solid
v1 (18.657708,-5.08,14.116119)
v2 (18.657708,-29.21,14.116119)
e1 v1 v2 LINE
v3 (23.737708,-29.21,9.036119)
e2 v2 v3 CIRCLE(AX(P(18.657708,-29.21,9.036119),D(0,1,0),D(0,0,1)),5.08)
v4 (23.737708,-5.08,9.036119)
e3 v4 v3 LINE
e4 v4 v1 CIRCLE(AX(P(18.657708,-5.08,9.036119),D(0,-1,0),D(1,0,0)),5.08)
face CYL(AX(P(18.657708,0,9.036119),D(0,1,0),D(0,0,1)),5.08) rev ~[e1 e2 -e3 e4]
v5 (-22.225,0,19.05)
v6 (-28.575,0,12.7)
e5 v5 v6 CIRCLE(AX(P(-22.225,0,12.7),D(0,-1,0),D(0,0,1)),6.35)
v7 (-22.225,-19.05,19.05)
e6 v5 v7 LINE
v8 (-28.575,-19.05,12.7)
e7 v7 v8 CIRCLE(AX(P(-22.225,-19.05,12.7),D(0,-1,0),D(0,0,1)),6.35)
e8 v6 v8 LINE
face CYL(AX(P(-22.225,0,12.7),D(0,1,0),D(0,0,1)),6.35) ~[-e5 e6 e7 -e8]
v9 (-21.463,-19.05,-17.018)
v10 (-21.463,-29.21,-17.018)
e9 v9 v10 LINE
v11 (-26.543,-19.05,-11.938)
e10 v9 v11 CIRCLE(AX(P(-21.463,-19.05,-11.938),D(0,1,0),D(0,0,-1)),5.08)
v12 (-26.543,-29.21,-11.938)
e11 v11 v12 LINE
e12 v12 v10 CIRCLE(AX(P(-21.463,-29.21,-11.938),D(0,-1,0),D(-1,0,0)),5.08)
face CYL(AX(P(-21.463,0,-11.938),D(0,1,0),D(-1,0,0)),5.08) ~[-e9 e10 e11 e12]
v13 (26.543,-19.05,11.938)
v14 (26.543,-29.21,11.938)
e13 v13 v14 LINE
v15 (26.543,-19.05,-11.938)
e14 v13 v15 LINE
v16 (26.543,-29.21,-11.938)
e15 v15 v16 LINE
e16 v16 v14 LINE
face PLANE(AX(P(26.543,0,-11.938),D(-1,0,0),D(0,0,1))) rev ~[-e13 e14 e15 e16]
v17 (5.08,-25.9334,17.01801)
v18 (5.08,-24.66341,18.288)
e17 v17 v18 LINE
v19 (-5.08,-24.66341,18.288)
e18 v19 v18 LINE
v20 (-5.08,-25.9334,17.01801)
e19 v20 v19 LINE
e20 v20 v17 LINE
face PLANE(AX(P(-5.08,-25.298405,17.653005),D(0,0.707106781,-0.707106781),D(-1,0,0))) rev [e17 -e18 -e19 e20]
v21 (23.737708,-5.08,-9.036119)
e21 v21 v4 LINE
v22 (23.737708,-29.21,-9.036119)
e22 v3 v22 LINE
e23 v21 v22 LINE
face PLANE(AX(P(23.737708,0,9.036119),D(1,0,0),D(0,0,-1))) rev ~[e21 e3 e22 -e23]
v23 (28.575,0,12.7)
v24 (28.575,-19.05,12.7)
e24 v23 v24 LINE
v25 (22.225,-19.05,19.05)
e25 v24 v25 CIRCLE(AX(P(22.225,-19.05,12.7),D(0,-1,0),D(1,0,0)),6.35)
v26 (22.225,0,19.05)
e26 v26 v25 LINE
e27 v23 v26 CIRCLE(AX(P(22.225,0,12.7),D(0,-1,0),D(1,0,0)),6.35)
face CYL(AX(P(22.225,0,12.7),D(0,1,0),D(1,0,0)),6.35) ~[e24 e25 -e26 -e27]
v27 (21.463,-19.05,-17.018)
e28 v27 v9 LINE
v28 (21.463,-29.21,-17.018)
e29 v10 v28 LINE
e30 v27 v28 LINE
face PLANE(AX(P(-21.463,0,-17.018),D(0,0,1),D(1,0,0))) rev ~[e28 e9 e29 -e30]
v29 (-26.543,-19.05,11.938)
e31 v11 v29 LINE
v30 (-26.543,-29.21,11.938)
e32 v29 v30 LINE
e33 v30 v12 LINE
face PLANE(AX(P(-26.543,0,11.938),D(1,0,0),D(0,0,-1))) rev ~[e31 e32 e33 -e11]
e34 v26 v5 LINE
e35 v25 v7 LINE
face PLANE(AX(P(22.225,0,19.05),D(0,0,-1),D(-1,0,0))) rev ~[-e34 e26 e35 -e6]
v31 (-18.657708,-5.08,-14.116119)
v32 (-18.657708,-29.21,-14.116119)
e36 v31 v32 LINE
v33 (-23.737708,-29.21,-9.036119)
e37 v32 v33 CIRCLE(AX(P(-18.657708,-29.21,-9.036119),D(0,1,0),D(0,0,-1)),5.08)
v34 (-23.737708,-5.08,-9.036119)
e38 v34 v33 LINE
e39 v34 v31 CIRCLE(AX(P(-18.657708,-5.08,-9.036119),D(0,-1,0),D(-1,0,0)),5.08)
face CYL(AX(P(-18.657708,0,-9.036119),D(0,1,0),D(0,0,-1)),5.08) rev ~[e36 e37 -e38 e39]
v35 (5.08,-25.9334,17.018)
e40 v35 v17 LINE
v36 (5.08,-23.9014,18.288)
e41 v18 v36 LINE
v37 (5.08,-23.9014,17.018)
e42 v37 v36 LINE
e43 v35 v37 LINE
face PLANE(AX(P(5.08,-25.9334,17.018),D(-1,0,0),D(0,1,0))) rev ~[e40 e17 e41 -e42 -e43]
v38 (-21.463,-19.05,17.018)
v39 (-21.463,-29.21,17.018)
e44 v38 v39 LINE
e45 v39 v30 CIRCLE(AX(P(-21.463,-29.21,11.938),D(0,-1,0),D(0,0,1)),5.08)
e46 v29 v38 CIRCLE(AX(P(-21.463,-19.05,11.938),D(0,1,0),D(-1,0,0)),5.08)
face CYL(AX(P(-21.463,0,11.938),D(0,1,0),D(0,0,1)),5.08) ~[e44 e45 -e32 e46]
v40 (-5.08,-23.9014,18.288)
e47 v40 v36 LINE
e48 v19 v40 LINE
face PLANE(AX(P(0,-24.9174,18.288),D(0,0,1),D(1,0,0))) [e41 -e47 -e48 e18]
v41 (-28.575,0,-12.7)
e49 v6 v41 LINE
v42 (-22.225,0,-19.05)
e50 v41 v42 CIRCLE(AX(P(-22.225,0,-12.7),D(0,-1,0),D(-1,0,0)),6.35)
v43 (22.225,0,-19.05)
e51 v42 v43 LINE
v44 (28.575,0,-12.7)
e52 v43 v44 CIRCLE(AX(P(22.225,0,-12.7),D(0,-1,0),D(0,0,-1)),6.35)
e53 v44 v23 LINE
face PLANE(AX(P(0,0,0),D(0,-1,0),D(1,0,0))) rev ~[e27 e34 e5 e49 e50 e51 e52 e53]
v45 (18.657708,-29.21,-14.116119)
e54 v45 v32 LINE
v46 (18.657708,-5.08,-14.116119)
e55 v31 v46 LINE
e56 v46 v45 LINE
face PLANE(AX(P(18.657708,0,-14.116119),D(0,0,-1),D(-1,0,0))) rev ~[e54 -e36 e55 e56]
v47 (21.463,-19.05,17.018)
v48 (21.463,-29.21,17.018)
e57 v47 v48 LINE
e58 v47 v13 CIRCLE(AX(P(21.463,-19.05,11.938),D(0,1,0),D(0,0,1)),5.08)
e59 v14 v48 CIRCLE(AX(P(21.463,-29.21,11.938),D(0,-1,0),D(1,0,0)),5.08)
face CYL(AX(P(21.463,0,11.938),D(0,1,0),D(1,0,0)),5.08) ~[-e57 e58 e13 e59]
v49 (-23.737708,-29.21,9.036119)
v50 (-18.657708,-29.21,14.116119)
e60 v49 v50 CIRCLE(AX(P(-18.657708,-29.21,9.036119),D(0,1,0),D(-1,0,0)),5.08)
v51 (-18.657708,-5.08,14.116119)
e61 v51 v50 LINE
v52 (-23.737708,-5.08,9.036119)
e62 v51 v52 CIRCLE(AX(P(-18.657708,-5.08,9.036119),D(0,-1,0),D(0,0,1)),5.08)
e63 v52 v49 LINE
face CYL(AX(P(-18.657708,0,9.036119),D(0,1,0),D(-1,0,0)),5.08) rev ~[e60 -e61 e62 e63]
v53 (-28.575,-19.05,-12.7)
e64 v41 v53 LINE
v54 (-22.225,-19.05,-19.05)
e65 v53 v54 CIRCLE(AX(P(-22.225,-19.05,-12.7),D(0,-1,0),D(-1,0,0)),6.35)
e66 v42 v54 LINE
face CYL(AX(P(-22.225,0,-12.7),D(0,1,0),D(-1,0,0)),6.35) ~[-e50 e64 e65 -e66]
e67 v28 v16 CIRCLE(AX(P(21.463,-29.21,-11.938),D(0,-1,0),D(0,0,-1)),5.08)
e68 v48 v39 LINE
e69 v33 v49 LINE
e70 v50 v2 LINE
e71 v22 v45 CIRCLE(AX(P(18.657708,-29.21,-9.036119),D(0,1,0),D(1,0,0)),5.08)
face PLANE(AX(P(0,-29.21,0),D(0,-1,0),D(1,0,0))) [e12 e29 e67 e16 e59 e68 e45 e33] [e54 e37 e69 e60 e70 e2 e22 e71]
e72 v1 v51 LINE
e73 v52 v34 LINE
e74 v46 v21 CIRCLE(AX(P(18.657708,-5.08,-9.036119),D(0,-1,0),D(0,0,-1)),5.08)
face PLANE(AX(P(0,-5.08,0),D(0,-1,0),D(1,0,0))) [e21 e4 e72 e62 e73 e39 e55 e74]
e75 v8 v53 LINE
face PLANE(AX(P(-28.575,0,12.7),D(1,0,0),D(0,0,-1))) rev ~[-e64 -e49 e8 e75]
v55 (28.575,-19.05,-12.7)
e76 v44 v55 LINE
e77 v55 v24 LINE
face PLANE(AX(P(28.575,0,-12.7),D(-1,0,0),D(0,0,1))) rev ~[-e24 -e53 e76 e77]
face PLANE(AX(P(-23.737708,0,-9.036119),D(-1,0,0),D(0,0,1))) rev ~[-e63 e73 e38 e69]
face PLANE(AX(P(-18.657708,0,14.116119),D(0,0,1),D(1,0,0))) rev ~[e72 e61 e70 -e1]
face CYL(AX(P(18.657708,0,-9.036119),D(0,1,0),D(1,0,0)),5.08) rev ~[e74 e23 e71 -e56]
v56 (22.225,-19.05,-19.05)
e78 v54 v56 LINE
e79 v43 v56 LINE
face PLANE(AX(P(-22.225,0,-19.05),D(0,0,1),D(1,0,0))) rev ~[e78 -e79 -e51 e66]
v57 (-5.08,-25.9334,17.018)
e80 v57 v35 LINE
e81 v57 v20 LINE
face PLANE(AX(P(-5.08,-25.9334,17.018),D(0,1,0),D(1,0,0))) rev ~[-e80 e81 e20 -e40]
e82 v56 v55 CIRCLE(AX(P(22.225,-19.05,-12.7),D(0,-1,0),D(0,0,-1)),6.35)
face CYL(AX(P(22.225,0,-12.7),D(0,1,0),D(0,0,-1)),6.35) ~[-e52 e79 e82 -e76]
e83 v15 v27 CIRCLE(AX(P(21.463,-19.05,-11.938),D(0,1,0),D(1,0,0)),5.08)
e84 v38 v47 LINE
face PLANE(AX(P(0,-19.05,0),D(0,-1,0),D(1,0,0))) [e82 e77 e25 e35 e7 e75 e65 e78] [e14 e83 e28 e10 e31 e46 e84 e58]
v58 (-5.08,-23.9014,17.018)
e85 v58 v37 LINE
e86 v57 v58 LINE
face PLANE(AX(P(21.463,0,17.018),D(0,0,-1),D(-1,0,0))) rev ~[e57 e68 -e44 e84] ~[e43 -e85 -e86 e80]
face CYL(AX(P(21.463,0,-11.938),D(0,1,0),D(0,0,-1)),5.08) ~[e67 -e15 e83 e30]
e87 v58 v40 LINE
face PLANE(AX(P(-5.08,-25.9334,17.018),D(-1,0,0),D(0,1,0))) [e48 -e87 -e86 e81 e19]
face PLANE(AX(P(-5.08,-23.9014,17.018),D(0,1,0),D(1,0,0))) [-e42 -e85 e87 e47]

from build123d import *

# Parameters (mm, degrees)
F1_DEPTH = 19.05
F2_DEPTH = 29.21
F3_DEPTH = 5.08
F4_W     = 10.16
F4_H     = 2.032
F5_DEPTH = 1.27
F6_SIZE  = 1.26999


# Not quite as in the source:
# - a fillet or chamfer is up to 0.001 mm smaller than in the source, because OpenCascade refuses the exact size


with BuildPart() as f1:
    # F0 (on Front) → F1 (new body)
    with BuildSketch(Plane.XZ):
        with BuildLine():
            ThreePointArc((28.575, 12.7), (26.7151280605, 17.1901280605), (22.225, 19.05))
            Line((22.225, 19.05), (-22.225, 19.05))
            ThreePointArc((-22.225, 19.05), (-26.7151280605, 17.1901280605), (-28.575, 12.7))
            Line((-28.575, 12.7), (-28.575, -12.7))
            ThreePointArc((-28.575, -12.7), (-26.7151280605, -17.1901280605), (-22.225, -19.05))
            Line((-22.225, -19.05), (22.225, -19.05))
            ThreePointArc((22.225, -19.05), (26.7151280605, -17.1901280605), (28.575, -12.7))
            Line((28.575, -12.7), (28.575, 12.7))
        make_face()
        with BuildLine():
            Line((-21.463, 17.018), (21.463, 17.018))
            ThreePointArc((21.463, 17.018), (25.0551024484, 15.5301024484), (26.543, 11.938))
            Line((26.543, 11.938), (26.543, -11.938))
            ThreePointArc((26.543, -11.938), (25.0551024484, -15.5301024484), (21.463, -17.018))
            Line((21.463, -17.018), (-21.463, -17.018))
            ThreePointArc((-21.463, -17.018), (-25.0551024484, -15.5301024484), (-26.543, -11.938))
            Line((-26.543, -11.938), (-26.543, 11.938))
            ThreePointArc((-26.543, 11.938), (-25.0551024484, 15.5301024484), (-21.463, 17.018))
        make_face(mode=Mode.SUBTRACT)
    extrude(amount=F1_DEPTH)

    # F0 (on Front) → F2 (join)
    with BuildSketch(Plane.XZ):
        with BuildLine():
            ThreePointArc((26.543, 11.938), (25.0551024484, 15.5301024484), (21.463, 17.018))
            Line((21.463, 17.018), (-21.463, 17.018))
            ThreePointArc((-21.463, 17.018), (-25.0551024484, 15.5301024484), (-26.543, 11.938))
            Line((-26.543, 11.938), (-26.543, -11.938))
            ThreePointArc((-26.543, -11.938), (-25.0551024484, -15.5301024484), (-21.463, -17.018))
            Line((-21.463, -17.018), (21.463, -17.018))
            ThreePointArc((21.463, -17.018), (25.0551024484, -15.5301024484), (26.543, -11.938))
            Line((26.543, -11.938), (26.543, 11.938))
        make_face()
        with BuildLine():
            ThreePointArc((-23.7377081066, 9.0361186621), (-22.2498105551, 12.6282211105), (-18.6577081066, 14.1161186621))
            Line((-18.6577081066, 14.1161186621), (18.6577081066, 14.1161186621))
            ThreePointArc((18.6577081066, 14.1161186621), (22.2498105551, 12.6282211105), (23.7377081066, 9.0361186621))
            Line((23.7377081066, 9.0361186621), (23.7377081066, -9.0361186621))
            ThreePointArc((23.7377081066, -9.0361186621), (22.2498105551, -12.6282211105), (18.6577081066, -14.1161186621))
            Line((18.6577081066, -14.1161186621), (-18.6577081066, -14.1161186621))
            ThreePointArc((-18.6577081066, -14.1161186621), (-22.2498105551, -12.6282211105), (-23.7377081066, -9.0361186621))
            Line((-23.7377081066, -9.0361186621), (-23.7377081066, 9.0361186621))
        make_face(mode=Mode.SUBTRACT)
    extrude(amount=F2_DEPTH)

    # F0 (on Front) → F3 (join)
    with BuildSketch(Plane.XZ):
        with BuildLine():
            Line((18.6577081066, 14.1161186621), (-18.6577081066, 14.1161186621))
            ThreePointArc((-18.6577081066, 14.1161186621), (-22.2498105551, 12.6282211105), (-23.7377081066, 9.0361186621))
            Line((-23.7377081066, 9.0361186621), (-23.7377081066, -9.0361186621))
            ThreePointArc((-23.7377081066, -9.0361186621), (-22.2498105551, -12.6282211105), (-18.6577081066, -14.1161186621))
            Line((-18.6577081066, -14.1161186621), (18.6577081066, -14.1161186621))
            ThreePointArc((18.6577081066, -14.1161186621), (22.2498105551, -12.6282211105), (23.7377081066, -9.0361186621))
            Line((23.7377081066, -9.0361186621), (23.7377081066, 9.0361186621))
            ThreePointArc((23.7377081066, 9.0361186621), (22.2498105551, 12.6282211105), (18.6577081066, 14.1161186621))
        make_face()
    extrude(amount=F3_DEPTH)

    # F4 (on face) → F5 (join)
    with BuildSketch(Plane.XY.offset(17.018)):
        with Locations((0, -24.9174)):
            Rectangle(F4_W, F4_H)
    extrude(amount=F5_DEPTH)

    # F6 (size 1.27 in the source; OpenCascade refuses exactly that, so slightly less here)
    f6_edges = [f1.edges().sort_by_distance(p)[0] for p in [
        (0, -25.9334, 18.288),
    ]]
    chamfer(f6_edges, length=F6_SIZE)


solid = f1.part
